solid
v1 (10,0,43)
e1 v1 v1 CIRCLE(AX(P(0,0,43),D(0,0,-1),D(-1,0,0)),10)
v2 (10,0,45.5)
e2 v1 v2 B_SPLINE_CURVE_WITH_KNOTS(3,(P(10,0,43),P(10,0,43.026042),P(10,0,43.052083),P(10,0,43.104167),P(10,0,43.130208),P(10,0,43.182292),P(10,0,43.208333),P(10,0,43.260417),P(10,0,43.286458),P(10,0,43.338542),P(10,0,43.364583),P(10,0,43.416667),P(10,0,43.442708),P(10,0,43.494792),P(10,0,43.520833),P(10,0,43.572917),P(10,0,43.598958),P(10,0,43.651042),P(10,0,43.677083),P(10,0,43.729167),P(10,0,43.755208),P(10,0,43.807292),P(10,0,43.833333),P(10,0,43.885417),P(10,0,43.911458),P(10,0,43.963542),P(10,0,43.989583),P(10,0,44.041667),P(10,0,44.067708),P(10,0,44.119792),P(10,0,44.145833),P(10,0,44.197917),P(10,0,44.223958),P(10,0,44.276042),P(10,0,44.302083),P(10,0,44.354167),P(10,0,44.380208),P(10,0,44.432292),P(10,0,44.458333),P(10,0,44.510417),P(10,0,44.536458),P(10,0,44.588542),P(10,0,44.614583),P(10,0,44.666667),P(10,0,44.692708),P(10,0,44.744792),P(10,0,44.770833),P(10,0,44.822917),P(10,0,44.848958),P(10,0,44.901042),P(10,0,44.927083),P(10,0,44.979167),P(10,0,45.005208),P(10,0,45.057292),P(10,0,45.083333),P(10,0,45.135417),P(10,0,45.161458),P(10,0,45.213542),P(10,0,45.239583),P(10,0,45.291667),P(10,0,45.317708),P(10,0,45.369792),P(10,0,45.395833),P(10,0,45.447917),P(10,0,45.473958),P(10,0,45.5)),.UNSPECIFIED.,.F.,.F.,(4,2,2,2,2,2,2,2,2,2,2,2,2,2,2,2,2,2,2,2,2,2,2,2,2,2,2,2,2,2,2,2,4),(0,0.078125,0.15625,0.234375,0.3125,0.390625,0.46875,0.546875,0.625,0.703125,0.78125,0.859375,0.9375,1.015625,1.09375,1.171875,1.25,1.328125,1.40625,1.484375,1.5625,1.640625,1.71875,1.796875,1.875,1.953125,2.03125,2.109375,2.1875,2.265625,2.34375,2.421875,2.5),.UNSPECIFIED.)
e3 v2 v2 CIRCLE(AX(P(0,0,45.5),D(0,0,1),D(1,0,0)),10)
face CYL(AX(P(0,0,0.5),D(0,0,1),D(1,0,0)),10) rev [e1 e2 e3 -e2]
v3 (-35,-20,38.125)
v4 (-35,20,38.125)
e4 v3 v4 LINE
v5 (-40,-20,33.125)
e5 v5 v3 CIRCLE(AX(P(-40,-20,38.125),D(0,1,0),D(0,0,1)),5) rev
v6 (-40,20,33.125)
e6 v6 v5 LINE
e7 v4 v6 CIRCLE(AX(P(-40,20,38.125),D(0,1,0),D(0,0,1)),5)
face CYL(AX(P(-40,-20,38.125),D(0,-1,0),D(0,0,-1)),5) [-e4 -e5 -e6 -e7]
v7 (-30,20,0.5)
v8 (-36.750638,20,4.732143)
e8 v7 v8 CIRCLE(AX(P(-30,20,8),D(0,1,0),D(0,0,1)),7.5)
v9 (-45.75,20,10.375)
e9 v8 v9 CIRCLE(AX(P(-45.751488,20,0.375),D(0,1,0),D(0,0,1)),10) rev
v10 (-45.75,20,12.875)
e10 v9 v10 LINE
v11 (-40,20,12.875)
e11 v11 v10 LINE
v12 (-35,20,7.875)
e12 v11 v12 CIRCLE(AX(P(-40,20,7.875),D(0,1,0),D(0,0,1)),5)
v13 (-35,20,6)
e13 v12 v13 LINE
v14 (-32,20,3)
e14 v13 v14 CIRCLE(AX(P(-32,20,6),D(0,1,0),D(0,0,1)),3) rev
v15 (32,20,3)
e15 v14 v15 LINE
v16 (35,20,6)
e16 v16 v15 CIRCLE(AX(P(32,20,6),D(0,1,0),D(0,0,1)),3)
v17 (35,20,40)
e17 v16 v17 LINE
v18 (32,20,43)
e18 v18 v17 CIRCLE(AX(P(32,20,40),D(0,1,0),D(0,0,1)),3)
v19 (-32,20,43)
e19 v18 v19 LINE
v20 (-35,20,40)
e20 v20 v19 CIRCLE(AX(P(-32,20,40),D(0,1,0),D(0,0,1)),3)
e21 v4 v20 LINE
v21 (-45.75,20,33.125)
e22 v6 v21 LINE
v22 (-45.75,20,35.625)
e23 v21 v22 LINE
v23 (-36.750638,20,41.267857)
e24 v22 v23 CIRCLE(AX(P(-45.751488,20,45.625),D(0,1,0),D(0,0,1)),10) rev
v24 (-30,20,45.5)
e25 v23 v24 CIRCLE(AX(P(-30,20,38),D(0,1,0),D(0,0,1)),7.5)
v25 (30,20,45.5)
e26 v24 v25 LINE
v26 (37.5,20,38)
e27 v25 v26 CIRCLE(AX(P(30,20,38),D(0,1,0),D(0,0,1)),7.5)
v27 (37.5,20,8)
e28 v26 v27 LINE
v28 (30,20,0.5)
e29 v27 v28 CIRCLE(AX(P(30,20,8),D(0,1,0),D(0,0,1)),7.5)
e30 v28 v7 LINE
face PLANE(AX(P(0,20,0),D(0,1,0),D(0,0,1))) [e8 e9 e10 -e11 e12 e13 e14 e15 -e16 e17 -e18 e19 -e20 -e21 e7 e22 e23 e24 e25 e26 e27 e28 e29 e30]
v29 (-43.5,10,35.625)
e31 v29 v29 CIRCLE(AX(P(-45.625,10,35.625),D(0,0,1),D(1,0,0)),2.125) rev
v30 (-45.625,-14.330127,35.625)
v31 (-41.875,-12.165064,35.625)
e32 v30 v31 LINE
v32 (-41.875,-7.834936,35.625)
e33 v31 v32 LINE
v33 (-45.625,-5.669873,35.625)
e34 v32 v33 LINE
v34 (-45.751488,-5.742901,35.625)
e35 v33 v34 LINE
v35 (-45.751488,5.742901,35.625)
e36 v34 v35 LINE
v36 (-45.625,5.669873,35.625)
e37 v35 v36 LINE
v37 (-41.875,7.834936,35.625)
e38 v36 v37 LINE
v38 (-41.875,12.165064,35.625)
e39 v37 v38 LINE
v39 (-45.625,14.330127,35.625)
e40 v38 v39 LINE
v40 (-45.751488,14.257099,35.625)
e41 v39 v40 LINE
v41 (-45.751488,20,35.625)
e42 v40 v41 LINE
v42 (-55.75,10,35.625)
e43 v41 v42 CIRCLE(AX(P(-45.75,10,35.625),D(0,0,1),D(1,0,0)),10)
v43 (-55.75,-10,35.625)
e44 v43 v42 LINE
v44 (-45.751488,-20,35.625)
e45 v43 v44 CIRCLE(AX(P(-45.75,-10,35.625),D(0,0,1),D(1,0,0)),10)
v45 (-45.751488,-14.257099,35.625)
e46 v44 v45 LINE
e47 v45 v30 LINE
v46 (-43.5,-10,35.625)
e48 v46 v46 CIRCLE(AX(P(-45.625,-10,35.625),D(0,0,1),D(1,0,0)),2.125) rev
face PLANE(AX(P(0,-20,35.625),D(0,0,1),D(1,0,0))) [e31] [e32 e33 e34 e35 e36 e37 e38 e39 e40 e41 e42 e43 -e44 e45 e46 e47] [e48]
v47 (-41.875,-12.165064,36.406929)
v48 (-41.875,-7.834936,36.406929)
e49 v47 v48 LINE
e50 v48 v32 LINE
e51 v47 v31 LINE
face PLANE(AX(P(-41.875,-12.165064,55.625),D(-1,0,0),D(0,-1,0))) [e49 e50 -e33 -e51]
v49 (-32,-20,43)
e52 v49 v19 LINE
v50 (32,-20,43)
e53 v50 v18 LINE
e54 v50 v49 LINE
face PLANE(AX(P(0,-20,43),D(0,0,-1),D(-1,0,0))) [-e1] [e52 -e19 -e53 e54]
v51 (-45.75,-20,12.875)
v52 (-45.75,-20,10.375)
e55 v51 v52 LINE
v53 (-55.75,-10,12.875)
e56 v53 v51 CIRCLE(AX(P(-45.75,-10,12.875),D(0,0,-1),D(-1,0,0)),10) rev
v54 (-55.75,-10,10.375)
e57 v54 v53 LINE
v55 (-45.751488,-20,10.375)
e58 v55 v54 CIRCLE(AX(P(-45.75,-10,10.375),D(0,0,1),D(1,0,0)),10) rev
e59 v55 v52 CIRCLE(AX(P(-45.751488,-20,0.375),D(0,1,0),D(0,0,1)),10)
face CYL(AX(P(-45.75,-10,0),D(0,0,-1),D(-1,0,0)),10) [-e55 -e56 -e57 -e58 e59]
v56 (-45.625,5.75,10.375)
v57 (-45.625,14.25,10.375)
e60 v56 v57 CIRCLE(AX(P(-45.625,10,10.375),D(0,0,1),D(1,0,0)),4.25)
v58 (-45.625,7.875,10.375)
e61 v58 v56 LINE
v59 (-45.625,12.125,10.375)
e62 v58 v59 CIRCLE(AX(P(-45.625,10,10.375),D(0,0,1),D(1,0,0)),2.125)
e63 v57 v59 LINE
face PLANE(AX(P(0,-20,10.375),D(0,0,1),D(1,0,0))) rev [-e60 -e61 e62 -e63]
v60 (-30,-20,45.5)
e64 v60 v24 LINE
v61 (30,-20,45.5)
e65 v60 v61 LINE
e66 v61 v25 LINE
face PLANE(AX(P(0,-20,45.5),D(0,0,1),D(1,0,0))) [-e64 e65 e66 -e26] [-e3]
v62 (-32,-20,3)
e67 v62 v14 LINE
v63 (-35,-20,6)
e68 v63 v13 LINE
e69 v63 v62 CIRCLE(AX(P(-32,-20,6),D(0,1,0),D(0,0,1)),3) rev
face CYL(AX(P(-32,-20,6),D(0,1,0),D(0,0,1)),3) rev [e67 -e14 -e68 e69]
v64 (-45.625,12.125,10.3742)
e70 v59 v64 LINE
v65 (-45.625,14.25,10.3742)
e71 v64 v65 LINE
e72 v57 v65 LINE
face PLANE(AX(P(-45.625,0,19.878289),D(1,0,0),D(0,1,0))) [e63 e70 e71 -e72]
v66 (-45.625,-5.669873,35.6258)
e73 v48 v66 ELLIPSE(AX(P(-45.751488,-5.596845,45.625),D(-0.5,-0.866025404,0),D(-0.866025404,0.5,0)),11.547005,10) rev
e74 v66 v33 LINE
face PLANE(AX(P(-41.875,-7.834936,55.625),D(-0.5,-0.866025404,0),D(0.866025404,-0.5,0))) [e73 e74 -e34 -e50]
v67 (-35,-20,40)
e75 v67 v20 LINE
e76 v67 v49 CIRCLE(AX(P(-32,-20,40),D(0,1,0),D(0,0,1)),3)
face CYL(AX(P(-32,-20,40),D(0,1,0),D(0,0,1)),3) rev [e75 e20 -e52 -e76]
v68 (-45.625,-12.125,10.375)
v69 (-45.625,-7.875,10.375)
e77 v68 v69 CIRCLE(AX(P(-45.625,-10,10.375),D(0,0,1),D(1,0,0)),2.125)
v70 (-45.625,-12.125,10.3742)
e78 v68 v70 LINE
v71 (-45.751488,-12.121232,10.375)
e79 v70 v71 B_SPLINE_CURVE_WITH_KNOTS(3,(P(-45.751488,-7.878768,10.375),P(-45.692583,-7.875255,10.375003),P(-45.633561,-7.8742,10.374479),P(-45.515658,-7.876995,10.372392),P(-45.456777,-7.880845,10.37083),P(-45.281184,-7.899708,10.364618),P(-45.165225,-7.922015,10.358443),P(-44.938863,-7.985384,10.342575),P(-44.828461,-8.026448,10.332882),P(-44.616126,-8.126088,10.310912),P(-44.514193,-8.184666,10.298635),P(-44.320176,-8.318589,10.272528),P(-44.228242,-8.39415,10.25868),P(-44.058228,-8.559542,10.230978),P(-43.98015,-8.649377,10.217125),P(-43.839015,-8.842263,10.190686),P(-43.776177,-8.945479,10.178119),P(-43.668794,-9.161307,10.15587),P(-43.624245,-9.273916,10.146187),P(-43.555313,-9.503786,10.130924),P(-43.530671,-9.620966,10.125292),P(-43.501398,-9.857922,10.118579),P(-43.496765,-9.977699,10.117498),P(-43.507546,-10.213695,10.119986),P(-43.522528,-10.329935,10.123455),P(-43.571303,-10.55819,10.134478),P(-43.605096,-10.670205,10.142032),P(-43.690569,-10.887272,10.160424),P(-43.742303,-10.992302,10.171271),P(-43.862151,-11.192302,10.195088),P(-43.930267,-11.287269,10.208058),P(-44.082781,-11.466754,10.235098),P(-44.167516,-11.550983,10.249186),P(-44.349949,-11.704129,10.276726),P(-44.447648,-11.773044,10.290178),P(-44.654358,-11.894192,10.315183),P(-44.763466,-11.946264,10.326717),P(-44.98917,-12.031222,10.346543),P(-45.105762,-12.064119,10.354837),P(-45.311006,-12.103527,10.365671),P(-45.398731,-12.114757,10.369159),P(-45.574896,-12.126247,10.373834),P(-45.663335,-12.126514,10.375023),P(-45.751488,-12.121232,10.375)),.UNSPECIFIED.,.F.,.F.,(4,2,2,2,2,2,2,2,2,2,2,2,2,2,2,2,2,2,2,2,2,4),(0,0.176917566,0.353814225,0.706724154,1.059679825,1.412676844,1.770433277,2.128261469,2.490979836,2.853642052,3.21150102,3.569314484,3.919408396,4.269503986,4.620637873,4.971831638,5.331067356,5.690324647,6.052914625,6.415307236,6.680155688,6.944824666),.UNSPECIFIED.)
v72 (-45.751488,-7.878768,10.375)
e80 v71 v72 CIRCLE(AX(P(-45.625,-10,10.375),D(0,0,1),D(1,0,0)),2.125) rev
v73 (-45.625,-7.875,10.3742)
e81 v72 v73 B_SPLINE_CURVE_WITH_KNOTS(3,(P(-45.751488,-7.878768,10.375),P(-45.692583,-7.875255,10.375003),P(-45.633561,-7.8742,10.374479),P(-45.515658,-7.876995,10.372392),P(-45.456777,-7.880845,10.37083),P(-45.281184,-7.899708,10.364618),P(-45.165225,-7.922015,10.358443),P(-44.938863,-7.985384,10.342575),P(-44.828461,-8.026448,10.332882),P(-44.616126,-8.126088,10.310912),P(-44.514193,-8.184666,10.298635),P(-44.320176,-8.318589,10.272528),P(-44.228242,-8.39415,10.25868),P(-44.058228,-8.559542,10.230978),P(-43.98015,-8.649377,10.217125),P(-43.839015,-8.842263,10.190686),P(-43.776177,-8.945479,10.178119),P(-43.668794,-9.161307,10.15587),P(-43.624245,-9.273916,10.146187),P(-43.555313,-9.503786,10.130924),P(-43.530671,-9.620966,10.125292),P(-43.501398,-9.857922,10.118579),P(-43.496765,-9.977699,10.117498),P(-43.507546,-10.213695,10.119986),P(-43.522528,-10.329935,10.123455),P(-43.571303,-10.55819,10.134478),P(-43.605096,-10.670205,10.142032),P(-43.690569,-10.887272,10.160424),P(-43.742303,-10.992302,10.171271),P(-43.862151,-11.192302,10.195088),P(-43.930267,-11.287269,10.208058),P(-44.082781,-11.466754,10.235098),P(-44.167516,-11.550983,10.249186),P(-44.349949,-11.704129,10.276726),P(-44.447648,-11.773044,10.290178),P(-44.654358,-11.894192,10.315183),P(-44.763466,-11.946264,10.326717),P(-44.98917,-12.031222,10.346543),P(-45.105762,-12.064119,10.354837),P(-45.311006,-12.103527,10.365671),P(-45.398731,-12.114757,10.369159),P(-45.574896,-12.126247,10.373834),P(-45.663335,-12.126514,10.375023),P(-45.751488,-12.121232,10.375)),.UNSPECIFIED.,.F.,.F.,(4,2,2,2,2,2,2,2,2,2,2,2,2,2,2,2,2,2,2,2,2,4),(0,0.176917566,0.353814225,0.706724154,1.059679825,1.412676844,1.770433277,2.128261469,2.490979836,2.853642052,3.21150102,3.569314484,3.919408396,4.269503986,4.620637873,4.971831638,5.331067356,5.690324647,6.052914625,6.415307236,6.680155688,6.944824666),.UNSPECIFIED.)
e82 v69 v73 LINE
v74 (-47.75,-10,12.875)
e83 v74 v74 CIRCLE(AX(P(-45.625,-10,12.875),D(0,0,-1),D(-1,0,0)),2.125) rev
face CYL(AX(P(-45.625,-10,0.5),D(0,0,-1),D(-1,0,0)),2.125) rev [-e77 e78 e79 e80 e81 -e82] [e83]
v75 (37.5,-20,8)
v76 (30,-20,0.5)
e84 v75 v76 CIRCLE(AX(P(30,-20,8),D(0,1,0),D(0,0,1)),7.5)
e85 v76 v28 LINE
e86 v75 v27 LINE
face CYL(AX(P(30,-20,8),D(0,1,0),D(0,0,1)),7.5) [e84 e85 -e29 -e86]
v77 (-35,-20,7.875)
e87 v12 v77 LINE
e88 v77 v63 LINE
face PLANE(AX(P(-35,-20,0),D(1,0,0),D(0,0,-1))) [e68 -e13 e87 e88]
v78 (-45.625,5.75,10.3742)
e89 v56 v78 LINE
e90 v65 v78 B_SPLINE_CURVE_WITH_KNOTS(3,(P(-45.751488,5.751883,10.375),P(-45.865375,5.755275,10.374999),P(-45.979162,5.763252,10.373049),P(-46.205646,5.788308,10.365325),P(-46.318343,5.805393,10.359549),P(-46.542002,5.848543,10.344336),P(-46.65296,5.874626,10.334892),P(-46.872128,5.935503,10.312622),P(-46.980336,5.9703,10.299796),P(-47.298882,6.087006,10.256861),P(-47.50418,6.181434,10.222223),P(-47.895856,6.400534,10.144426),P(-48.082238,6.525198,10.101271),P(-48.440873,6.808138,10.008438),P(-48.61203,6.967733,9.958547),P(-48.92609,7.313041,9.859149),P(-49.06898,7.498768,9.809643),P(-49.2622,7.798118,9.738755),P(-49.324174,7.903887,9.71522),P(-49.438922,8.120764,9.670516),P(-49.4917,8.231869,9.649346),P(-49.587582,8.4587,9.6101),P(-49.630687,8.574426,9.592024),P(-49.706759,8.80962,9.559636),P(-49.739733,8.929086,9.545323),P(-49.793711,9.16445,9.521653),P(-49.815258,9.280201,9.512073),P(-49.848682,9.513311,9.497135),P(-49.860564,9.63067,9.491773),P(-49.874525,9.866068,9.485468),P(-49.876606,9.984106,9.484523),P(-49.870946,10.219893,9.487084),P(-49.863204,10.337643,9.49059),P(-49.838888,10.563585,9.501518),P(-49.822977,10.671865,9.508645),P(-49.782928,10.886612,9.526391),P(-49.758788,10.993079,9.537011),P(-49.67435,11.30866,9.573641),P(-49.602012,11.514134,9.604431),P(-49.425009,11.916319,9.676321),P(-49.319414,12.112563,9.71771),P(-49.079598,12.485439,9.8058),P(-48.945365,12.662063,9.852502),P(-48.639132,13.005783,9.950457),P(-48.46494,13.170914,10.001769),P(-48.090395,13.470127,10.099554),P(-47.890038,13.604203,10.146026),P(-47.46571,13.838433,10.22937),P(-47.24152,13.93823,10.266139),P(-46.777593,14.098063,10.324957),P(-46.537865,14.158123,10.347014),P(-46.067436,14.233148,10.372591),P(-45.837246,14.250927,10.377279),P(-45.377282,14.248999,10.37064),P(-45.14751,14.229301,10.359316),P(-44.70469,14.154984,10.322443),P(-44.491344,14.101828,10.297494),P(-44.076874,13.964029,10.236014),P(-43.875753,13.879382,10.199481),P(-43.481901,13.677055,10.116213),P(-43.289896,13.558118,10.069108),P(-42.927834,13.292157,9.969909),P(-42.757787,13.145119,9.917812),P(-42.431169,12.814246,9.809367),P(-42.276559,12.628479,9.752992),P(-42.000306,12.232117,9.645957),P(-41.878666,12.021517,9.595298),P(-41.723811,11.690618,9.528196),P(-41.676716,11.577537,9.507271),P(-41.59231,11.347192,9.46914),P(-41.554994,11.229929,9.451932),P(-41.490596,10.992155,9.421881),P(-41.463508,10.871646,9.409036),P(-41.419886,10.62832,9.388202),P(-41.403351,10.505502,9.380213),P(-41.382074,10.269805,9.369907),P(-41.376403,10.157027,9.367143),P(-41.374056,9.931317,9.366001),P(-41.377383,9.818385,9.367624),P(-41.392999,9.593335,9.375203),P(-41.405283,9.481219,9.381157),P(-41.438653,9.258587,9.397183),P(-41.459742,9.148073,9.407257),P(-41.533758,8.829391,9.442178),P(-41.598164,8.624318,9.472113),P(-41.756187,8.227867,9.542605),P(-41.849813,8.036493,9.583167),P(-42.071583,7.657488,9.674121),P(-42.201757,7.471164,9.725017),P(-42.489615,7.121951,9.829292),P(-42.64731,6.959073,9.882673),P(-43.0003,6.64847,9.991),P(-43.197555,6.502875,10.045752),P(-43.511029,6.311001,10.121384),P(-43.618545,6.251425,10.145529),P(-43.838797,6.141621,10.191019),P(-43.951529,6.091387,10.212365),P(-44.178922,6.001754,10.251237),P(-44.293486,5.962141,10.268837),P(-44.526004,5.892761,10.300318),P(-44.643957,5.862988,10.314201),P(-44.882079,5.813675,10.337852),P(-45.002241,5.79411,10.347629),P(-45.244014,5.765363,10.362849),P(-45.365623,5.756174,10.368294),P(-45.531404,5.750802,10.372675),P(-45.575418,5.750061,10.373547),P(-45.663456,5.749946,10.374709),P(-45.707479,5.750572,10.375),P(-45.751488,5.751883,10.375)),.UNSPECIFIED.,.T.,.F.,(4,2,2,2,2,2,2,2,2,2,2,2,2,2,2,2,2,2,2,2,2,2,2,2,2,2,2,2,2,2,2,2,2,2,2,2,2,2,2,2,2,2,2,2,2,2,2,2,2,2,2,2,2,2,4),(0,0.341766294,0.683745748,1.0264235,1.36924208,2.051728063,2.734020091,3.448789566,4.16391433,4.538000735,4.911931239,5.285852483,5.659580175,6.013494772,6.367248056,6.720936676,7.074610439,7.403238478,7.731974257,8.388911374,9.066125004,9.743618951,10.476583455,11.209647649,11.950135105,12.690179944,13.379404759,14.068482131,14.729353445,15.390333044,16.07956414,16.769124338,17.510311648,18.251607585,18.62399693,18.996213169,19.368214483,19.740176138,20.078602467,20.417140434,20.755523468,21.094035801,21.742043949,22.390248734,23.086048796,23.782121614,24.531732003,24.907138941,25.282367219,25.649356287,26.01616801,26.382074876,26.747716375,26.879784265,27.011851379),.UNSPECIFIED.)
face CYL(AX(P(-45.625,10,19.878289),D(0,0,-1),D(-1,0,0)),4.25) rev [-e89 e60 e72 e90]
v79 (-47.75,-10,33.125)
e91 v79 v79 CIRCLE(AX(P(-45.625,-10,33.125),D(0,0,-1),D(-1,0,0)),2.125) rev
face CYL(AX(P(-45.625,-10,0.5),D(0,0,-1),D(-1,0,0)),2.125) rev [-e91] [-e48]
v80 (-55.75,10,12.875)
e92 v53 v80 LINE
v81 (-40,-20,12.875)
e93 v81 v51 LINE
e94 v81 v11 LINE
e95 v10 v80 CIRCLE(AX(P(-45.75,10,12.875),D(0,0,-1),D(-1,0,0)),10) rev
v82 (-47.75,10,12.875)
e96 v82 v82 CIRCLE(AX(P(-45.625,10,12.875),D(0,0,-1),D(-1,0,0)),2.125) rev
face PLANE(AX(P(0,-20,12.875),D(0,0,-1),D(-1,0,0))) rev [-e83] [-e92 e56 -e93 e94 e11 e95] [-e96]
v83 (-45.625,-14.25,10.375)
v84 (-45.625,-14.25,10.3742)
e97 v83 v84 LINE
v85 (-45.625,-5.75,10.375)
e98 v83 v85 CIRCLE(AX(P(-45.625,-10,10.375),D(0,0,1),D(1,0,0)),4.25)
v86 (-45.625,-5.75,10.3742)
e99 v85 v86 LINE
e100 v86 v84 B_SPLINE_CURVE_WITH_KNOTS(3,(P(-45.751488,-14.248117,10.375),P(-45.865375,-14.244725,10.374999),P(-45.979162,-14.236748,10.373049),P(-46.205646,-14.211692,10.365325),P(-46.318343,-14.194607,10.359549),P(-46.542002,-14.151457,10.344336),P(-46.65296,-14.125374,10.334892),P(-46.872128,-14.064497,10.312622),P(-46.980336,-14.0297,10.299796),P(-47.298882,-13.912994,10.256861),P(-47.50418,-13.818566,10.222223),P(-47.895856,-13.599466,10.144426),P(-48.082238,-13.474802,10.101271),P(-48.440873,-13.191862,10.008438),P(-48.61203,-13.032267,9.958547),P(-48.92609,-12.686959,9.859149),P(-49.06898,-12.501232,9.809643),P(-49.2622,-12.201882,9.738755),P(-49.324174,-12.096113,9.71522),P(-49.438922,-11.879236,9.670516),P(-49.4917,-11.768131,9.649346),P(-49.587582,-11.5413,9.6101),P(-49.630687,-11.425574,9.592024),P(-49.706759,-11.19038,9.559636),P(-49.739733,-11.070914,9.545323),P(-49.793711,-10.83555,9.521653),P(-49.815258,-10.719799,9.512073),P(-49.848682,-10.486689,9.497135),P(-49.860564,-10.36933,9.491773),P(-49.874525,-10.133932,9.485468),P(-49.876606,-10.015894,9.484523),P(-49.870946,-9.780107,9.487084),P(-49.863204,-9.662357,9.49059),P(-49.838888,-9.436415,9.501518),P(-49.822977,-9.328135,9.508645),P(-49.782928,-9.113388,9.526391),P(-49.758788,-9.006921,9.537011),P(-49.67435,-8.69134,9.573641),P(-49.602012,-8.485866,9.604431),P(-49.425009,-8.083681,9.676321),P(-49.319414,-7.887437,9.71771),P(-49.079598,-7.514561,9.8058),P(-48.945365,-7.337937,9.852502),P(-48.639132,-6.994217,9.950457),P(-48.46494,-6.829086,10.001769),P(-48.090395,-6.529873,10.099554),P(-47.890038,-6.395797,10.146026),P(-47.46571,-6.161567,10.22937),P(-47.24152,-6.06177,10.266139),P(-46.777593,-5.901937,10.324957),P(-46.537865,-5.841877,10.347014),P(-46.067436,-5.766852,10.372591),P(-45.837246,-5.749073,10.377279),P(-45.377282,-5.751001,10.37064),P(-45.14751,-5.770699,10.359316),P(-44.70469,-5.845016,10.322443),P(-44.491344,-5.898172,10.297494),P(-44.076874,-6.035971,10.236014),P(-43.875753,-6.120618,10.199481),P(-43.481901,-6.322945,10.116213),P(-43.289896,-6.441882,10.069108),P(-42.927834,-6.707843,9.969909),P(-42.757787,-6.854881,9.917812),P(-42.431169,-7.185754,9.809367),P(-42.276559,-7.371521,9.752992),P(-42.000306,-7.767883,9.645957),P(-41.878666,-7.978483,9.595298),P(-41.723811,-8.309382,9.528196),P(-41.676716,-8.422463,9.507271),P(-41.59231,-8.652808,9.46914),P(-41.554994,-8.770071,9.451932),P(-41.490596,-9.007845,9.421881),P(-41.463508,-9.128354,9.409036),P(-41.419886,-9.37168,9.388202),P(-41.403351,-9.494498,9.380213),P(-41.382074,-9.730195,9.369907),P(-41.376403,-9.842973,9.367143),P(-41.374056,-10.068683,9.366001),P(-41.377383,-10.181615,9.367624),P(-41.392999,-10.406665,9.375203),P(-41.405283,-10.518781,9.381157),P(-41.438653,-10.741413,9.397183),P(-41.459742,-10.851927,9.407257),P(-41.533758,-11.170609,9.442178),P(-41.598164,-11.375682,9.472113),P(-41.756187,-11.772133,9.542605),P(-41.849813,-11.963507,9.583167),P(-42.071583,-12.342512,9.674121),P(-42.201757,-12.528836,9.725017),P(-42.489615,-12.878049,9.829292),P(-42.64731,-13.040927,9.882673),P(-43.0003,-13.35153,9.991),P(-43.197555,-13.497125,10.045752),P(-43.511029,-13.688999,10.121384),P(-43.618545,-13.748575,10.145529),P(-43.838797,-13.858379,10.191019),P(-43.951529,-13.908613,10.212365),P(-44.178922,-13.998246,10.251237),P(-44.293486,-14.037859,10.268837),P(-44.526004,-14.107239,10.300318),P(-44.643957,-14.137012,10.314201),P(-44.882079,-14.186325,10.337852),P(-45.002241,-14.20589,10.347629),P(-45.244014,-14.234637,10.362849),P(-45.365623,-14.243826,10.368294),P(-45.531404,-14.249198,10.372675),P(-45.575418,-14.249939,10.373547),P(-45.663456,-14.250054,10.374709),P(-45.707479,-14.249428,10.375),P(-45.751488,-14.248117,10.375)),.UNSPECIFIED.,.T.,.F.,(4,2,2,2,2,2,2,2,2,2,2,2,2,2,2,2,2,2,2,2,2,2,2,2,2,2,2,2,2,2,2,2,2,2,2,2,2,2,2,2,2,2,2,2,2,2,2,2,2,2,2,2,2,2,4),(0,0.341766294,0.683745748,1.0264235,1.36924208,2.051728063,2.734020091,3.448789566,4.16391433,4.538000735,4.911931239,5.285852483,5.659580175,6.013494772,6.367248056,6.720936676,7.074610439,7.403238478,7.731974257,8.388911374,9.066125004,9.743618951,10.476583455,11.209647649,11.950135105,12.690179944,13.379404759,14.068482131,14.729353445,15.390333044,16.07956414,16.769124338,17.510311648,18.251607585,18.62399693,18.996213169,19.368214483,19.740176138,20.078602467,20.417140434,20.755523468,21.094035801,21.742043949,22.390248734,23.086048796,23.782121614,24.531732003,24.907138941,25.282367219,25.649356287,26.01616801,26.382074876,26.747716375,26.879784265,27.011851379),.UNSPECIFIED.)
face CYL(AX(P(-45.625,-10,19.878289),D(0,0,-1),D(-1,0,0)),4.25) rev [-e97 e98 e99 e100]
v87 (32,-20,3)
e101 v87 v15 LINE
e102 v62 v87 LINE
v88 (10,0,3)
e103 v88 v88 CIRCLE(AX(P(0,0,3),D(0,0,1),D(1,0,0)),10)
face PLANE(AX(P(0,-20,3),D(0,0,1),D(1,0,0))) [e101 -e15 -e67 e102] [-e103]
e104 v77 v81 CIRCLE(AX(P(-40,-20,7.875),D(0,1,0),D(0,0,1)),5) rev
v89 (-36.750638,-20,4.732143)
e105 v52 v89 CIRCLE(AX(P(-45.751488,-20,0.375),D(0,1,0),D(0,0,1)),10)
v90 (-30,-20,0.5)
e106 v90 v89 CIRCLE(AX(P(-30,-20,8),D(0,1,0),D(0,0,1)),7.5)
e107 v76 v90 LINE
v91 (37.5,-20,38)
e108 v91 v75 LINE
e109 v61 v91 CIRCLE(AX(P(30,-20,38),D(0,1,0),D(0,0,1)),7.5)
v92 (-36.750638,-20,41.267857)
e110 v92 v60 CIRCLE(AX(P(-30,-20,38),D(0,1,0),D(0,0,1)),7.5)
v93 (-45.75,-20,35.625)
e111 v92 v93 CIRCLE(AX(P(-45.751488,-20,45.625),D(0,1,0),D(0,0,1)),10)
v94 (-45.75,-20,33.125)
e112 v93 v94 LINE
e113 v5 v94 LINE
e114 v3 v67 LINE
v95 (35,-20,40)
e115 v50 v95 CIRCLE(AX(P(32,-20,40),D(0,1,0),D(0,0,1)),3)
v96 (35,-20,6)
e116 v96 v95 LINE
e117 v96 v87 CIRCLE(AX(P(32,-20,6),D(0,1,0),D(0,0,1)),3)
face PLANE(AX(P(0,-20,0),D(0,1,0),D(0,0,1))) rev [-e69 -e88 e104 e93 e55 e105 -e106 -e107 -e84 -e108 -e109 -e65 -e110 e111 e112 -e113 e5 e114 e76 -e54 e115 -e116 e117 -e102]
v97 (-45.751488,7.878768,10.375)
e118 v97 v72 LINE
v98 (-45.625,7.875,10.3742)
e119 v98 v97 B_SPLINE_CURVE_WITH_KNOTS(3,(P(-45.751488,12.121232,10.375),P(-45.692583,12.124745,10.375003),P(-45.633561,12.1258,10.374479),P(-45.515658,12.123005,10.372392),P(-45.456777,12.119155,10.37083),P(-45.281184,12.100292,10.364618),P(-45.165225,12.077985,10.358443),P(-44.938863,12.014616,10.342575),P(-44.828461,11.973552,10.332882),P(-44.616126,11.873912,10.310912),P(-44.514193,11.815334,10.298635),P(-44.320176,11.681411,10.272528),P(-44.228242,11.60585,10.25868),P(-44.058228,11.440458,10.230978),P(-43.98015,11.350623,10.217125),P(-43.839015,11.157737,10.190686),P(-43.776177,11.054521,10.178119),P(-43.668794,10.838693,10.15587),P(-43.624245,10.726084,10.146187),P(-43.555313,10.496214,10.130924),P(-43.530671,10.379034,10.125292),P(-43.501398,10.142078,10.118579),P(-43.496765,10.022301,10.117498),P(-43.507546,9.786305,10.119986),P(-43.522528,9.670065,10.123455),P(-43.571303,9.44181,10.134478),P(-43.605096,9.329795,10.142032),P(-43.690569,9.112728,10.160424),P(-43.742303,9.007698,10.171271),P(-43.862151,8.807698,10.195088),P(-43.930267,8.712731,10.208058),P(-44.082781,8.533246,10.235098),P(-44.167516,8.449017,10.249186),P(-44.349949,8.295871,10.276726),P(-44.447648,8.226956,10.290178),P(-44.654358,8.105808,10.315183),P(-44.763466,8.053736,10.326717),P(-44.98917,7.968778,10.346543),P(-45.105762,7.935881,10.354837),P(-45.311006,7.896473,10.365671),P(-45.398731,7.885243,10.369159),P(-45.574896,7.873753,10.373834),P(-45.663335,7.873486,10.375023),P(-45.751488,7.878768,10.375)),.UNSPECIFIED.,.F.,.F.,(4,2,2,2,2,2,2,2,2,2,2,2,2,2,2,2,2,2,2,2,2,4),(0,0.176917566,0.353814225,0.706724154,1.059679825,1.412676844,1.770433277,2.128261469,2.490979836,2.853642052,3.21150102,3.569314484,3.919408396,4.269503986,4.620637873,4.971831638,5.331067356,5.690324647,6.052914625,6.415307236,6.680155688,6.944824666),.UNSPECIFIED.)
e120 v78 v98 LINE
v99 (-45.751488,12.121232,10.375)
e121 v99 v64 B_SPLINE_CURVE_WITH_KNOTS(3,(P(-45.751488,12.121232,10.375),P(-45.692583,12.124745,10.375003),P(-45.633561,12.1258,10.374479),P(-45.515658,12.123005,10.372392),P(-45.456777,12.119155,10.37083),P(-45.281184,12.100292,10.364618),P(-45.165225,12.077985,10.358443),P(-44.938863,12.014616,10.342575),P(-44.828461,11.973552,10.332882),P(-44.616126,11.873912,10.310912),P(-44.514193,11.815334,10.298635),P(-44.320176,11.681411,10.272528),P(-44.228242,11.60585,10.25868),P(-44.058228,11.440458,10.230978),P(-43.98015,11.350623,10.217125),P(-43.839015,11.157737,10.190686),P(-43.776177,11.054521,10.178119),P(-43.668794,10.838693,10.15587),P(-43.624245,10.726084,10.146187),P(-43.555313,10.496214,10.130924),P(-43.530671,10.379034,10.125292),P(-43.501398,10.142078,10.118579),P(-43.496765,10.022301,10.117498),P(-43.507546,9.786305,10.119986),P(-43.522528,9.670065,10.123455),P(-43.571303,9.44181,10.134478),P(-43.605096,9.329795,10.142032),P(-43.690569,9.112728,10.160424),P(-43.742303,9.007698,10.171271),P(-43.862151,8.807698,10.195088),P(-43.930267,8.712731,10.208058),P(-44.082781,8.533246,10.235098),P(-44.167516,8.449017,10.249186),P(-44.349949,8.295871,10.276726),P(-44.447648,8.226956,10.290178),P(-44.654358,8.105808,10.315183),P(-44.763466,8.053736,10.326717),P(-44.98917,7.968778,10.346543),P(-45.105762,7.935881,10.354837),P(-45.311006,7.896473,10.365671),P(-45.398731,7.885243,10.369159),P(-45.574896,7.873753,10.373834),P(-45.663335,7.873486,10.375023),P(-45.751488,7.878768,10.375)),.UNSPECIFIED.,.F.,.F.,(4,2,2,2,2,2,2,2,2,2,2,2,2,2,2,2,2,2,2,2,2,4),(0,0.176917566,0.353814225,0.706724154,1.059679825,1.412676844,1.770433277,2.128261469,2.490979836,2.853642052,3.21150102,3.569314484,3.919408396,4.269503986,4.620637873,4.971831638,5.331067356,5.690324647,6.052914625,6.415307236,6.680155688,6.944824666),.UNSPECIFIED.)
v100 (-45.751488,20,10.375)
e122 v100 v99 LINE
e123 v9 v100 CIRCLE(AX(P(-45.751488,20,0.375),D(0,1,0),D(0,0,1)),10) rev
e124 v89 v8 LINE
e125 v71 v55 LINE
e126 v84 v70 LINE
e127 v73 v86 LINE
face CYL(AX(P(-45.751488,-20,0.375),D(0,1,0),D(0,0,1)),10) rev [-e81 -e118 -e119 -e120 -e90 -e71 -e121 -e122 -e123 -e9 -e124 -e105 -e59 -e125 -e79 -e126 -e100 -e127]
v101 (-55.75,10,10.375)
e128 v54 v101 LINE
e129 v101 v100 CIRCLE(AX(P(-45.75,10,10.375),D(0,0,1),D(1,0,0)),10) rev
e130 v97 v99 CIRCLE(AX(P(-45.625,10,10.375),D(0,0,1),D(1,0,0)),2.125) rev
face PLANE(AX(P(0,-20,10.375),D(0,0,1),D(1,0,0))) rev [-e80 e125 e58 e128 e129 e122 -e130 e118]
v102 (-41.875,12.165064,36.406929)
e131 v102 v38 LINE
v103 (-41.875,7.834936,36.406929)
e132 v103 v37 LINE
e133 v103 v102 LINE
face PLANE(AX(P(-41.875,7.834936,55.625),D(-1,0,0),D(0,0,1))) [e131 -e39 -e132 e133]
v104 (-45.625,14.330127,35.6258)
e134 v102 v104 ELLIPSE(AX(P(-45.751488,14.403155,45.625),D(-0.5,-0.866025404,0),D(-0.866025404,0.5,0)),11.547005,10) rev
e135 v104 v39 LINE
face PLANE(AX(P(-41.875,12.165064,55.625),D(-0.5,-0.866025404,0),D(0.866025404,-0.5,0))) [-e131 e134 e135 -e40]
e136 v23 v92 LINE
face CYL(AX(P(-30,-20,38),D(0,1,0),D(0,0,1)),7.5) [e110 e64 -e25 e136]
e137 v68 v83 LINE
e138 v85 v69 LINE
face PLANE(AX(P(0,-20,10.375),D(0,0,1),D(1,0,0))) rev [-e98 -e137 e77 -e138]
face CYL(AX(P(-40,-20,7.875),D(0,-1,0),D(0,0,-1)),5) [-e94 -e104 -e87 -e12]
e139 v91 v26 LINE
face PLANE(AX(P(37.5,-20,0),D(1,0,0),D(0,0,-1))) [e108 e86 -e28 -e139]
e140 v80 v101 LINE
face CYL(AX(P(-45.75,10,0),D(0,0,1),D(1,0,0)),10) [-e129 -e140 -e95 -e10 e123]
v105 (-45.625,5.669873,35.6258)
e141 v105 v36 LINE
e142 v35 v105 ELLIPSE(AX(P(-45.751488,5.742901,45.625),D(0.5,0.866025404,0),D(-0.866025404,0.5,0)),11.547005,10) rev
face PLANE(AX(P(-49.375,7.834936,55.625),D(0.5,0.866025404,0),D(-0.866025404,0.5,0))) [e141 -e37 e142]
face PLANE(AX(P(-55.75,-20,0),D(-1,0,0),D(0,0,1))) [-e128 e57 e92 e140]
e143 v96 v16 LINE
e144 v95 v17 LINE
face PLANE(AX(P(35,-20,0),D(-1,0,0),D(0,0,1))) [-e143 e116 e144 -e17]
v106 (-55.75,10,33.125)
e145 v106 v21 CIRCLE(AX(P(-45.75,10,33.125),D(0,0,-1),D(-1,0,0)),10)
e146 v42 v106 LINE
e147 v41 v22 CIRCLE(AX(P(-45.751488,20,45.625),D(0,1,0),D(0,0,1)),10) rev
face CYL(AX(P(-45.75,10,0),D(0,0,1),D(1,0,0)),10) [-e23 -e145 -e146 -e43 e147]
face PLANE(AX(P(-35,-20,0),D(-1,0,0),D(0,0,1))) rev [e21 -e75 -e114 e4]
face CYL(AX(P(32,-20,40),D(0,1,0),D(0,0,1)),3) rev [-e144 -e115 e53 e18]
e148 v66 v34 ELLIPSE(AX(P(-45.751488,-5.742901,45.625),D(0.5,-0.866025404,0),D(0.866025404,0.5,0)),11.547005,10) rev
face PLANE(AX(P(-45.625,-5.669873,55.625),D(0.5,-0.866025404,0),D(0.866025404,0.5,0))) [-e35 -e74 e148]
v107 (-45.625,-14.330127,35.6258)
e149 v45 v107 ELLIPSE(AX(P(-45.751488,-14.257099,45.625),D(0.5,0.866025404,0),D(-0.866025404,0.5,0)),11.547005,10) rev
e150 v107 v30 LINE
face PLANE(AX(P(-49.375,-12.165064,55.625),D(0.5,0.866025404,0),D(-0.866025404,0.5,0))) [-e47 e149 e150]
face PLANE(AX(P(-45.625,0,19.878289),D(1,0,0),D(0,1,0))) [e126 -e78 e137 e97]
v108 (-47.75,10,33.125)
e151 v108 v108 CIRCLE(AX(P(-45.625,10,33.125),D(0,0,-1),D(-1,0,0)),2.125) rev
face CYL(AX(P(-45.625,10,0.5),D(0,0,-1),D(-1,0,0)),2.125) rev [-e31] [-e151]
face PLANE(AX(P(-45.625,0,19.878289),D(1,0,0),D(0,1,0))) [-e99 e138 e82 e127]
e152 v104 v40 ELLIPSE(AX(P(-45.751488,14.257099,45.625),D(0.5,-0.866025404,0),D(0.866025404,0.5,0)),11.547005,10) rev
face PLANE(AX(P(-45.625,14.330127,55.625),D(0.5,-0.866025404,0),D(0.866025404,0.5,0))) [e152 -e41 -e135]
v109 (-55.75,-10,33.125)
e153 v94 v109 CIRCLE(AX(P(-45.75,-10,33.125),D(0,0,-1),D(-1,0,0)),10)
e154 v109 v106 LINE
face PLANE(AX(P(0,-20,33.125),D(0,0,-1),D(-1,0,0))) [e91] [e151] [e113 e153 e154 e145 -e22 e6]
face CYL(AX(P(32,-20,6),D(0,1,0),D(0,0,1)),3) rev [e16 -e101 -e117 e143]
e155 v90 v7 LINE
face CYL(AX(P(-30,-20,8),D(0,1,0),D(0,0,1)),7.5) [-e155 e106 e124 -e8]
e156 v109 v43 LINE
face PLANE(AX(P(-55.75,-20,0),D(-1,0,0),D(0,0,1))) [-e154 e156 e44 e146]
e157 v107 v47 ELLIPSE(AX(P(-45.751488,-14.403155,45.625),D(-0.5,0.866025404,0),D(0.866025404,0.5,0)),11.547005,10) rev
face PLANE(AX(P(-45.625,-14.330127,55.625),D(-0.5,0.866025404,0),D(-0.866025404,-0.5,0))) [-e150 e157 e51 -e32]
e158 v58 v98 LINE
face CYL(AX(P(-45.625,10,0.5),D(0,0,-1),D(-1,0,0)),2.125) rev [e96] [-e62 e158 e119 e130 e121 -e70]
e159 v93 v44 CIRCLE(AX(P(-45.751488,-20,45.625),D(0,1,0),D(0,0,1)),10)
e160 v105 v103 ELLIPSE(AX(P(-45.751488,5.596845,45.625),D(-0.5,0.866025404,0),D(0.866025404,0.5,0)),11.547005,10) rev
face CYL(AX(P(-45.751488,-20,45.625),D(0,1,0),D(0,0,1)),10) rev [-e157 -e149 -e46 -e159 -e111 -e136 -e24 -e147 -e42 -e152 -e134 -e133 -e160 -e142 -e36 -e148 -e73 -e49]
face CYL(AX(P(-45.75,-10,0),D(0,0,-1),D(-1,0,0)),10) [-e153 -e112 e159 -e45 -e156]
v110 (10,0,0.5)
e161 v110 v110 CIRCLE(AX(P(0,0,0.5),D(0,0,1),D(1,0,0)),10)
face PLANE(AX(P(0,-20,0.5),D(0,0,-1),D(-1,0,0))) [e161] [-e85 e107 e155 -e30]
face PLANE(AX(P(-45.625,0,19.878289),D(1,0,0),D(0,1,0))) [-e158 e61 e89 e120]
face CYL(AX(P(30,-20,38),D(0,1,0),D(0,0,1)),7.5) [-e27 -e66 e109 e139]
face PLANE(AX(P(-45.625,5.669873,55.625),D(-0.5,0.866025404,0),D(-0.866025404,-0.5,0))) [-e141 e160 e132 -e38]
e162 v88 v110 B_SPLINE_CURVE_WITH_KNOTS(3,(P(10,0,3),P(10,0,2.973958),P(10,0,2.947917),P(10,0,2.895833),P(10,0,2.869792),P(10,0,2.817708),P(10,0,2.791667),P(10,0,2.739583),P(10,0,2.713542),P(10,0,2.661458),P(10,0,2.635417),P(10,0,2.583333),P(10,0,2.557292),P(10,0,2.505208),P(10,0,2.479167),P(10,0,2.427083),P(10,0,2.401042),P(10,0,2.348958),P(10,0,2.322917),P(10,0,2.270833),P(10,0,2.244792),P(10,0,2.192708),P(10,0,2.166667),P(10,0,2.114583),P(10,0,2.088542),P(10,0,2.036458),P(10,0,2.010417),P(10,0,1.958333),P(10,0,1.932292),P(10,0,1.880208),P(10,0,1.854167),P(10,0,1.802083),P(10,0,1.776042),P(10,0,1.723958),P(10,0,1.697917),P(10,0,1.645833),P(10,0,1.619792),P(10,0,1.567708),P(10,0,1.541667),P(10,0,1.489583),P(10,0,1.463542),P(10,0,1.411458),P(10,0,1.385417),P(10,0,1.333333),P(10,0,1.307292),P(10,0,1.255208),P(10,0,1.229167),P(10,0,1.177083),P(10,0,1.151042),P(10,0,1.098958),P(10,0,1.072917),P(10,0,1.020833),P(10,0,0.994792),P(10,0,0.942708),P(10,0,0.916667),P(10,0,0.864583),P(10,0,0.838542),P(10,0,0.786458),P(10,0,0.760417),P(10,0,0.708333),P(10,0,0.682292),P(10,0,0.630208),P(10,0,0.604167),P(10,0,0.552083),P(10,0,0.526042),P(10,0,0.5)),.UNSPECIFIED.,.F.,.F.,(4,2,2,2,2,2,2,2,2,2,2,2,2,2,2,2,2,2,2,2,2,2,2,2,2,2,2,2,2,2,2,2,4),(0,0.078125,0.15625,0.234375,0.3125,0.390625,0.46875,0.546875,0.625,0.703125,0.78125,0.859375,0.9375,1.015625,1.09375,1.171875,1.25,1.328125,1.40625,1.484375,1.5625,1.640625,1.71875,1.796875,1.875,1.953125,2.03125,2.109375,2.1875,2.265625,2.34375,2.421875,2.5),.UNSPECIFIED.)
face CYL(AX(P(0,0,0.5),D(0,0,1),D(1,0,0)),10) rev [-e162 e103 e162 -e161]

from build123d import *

# Parameters (mm, degrees)
BOSS_EXTRUDE1_DEPTH                 = 20
BOSS_EXTRUDE1_DEPTH_BACK            = 20
FILLET1_R                           = 10
CUT_EXTRUDE1_DEPTH                  = 75.688101624
CUT_EXTRUDE1_DEPTH_BACK             = 75.688101624
CUT_EXTRUDE2_DEPTH                  = 10.375
CUT_EXTRUDE2_DIRECTION_2_REACH      = 76.688
CUT_EXTRUDE2_DIRECTION_2_END_RADIUS = 10
FILLET2_R                           = 10
FILLET3_R                           = 5
CUT_EXTRUDE3_DEPTH                  = 20
CUT_EXTRUDE4_DEPTH                  = 75.384558372
CUT_EXTRUDE4_DEPTH_BACK             = 75.384558372
SKETCH4_R                           = 10


with BuildPart() as part:
    # Sketch1 → Boss-Extrude1 (new, two sides: drawn at the far end of the back side and taken through both)
    with BuildSketch(Plane(origin=(0, 0, 0), x_dir=(1, 0, 0), z_dir=(0, 1, 0)).offset(-BOSS_EXTRUDE1_DEPTH_BACK)):
        with BuildLine():
            Line((-35, -33.125), (-55.75, -33.125))
            Line((-55.75, -33.125), (-55.75, -35.625))
            Line((-55.75, -35.625), (-37.5, -35.625))
            Line((-37.5, -35.625), (-37.5, -38))
            ThreePointArc((-37.5, -38), (-35.303300859, -43.303300859), (-30, -45.5))
            Line((-30, -45.5), (30, -45.5))
            ThreePointArc((30, -45.5), (35.303300859, -43.303300859), (37.5, -38))
            Line((37.5, -38), (37.5, -8))
            ThreePointArc((37.5, -8), (35.303300859, -2.696699141), (30, -0.5))
            Line((30, -0.5), (-30, -0.5))
            ThreePointArc((-30, -0.5), (-35.303300859, -2.696699141), (-37.5, -8))
            Line((-37.5, -8), (-37.5, -10.375))
            Line((-37.5, -10.375), (-55.75, -10.375))
            Line((-55.75, -10.375), (-55.75, -12.875))
            Line((-55.75, -12.875), (-35, -12.875))
            Line((-35, -12.875), (-35, -6))
            ThreePointArc((-35, -6), (-34.121320344, -3.878679656), (-32, -3))
            Line((-32, -3), (32, -3))
            ThreePointArc((32, -3), (34.121320344, -3.878679656), (35, -6))
            Line((35, -6), (35, -40))
            ThreePointArc((35, -40), (34.121320344, -42.121320344), (32, -43))
            Line((32, -43), (-32, -43))
            ThreePointArc((-32, -43), (-34.121320344, -42.121320344), (-35, -40))
            Line((-35, -40), (-35, -33.125))
        make_face()
    extrude(amount=BOSS_EXTRUDE1_DEPTH + BOSS_EXTRUDE1_DEPTH_BACK)

    # Fillet1
    fillet1_edges = [part.edges().sort_by_distance(p)[0] for p in [
        (-37.5, 0, 10.375),
        (-37.5, 0, 35.625),
    ]]
    fillet(fillet1_edges, radius=FILLET1_R)

    # Sketch2 → Cut-Extrude1 (cut, two sides: drawn at the far end of the back side and taken through both)
    with BuildSketch(Plane.XY.offset(-CUT_EXTRUDE1_DEPTH_BACK)):
        with BuildLine():
            ThreePointArc((-43.5, -10), (-44.12239809, -8.49739809), (-45.625, -7.875))
            Line((-45.625, -7.875), (-45.625, -12.125))
            ThreePointArc((-45.625, -12.125), (-44.12239809, -11.50260191), (-43.5, -10))
        make_face()
        with BuildLine():
            Line((-45.625, -12.125), (-45.625, -7.875))
            ThreePointArc((-45.625, -7.875), (-47.75, -10), (-45.625, -12.125))
        make_face()
        with BuildLine():
            ThreePointArc((-43.5, 10), (-44.12239809, 11.50260191), (-45.625, 12.125))
            Line((-45.625, 12.125), (-45.625, 7.875))
            ThreePointArc((-45.625, 7.875), (-44.12239809, 8.49739809), (-43.5, 10))
        make_face()
        with BuildLine():
            Line((-45.625, 7.875), (-45.625, 12.125))
            ThreePointArc((-45.625, 12.125), (-47.75, 10), (-45.625, 7.875))
        make_face()
    extrude(amount=CUT_EXTRUDE1_DEPTH + CUT_EXTRUDE1_DEPTH_BACK, mode=Mode.SUBTRACT)

    # Sketch2<4> → Cut-Extrude2 (cut)
    with BuildSketch(Plane.XY):
        with BuildLine():
            ThreePointArc((-41.375, 10), (-42.61979618, 13.00520382), (-45.625, 14.25))
            Line((-45.625, 14.25), (-45.625, 12.125))
            ThreePointArc((-45.625, 12.125), (-44.12239809, 11.50260191), (-43.5, 10))
            ThreePointArc((-43.5, 10), (-44.12239809, 8.49739809), (-45.625, 7.875))
            Line((-45.625, 7.875), (-45.625, 5.75))
            ThreePointArc((-45.625, 5.75), (-42.61979618, 6.99479618), (-41.375, 10))
        make_face()
        with BuildLine():
            Line((-45.625, 12.125), (-45.625, 14.25))
            ThreePointArc((-45.625, 14.25), (-49.875, 10), (-45.625, 5.75))
            Line((-45.625, 5.75), (-45.625, 7.875))
            ThreePointArc((-45.625, 7.875), (-47.75, 10), (-45.625, 12.125))
        make_face()
        with BuildLine():
            ThreePointArc((-41.375, -10), (-42.61979618, -6.99479618), (-45.625, -5.75))
            Line((-45.625, -5.75), (-45.625, -7.875))
            ThreePointArc((-45.625, -7.875), (-44.12239809, -8.49739809), (-43.5, -10))
            ThreePointArc((-43.5, -10), (-44.12239809, -11.50260191), (-45.625, -12.125))
            Line((-45.625, -12.125), (-45.625, -14.25))
            ThreePointArc((-45.625, -14.25), (-42.61979618, -13.00520382), (-41.375, -10))
        make_face()
        with BuildLine():
            Line((-45.625, -7.875), (-45.625, -5.75))
            ThreePointArc((-45.625, -5.75), (-49.875, -10), (-45.625, -14.25))
            Line((-45.625, -14.25), (-45.625, -12.125))
            ThreePointArc((-45.625, -12.125), (-47.75, -10), (-45.625, -7.875))
        make_face()
    extrude(amount=CUT_EXTRUDE2_DEPTH, mode=Mode.SUBTRACT)

    # Cut-Extrude2 direction 2: up to this cylinder (the profile starts inside it)
    cut_extrude2_direction_2_end = Plane(origin=(-45.751488025, -2.938005, 0.375), z_dir=(0, 1, 0)) * Cylinder(CUT_EXTRUDE2_DIRECTION_2_END_RADIUS, 194.376, mode=Mode.PRIVATE)
    # Sketch2<4> → Cut-Extrude2 direction 2 (cut, up to the surface)
    with BuildSketch(Plane.XY, mode=Mode.PRIVATE) as cut_extrude2_direction_2_sk1:
        with BuildLine():
            ThreePointArc((-41.375, 10), (-42.61979618, 13.00520382), (-45.625, 14.25))
            Line((-45.625, 14.25), (-45.625, 12.125))
            ThreePointArc((-45.625, 12.125), (-44.12239809, 11.50260191), (-43.5, 10))
            ThreePointArc((-43.5, 10), (-44.12239809, 8.49739809), (-45.625, 7.875))
            Line((-45.625, 7.875), (-45.625, 5.75))
            ThreePointArc((-45.625, 5.75), (-42.61979618, 6.99479618), (-41.375, 10))
        make_face()
    cut_extrude2_direction_2_tool1 = extrude(cut_extrude2_direction_2_sk1.sketch, amount=-CUT_EXTRUDE2_DIRECTION_2_REACH, mode=Mode.PRIVATE) & cut_extrude2_direction_2_end
    add(cut_extrude2_direction_2_tool1.solids().sort_by_distance((-42.686995, 7.061995, 0))[0], mode=Mode.SUBTRACT)
    # Sketch2<4> → Cut-Extrude2 direction 2 (cut, up to the surface)
    with BuildSketch(Plane.XY, mode=Mode.PRIVATE) as cut_extrude2_direction_2_sk2:
        with BuildLine():
            Line((-45.625, 12.125), (-45.625, 14.25))
            ThreePointArc((-45.625, 14.25), (-49.875, 10), (-45.625, 5.75))
            Line((-45.625, 5.75), (-45.625, 7.875))
            ThreePointArc((-45.625, 7.875), (-47.75, 10), (-45.625, 12.125))
        make_face()
    cut_extrude2_direction_2_tool2 = extrude(cut_extrude2_direction_2_sk2.sketch, amount=-CUT_EXTRUDE2_DIRECTION_2_REACH, mode=Mode.PRIVATE) & cut_extrude2_direction_2_end
    add(cut_extrude2_direction_2_tool2.solids().sort_by_distance((-45.720033, 6.8125, 0))[0], mode=Mode.SUBTRACT)
    # Sketch2<4> → Cut-Extrude2 direction 2 (cut, up to the surface)
    with BuildSketch(Plane.XY, mode=Mode.PRIVATE) as cut_extrude2_direction_2_sk3:
        with BuildLine():
            ThreePointArc((-41.375, -10), (-42.61979618, -6.99479618), (-45.625, -5.75))
            Line((-45.625, -5.75), (-45.625, -7.875))
            ThreePointArc((-45.625, -7.875), (-44.12239809, -8.49739809), (-43.5, -10))
            ThreePointArc((-43.5, -10), (-44.12239809, -11.50260191), (-45.625, -12.125))
            Line((-45.625, -12.125), (-45.625, -14.25))
            ThreePointArc((-45.625, -14.25), (-42.61979618, -13.00520382), (-41.375, -10))
        make_face()
    cut_extrude2_direction_2_tool3 = extrude(cut_extrude2_direction_2_sk3.sketch, amount=-CUT_EXTRUDE2_DIRECTION_2_REACH, mode=Mode.PRIVATE) & cut_extrude2_direction_2_end
    add(cut_extrude2_direction_2_tool3.solids().sort_by_distance((-42.686995, -12.938005, 0))[0], mode=Mode.SUBTRACT)
    # Sketch2<4> → Cut-Extrude2 direction 2 (cut, up to the surface)
    with BuildSketch(Plane.XY, mode=Mode.PRIVATE) as cut_extrude2_direction_2_sk4:
        with BuildLine():
            Line((-45.625, -7.875), (-45.625, -5.75))
            ThreePointArc((-45.625, -5.75), (-49.875, -10), (-45.625, -14.25))
            Line((-45.625, -14.25), (-45.625, -12.125))
            ThreePointArc((-45.625, -12.125), (-47.75, -10), (-45.625, -7.875))
        make_face()
    cut_extrude2_direction_2_tool4 = extrude(cut_extrude2_direction_2_sk4.sketch, amount=-CUT_EXTRUDE2_DIRECTION_2_REACH, mode=Mode.PRIVATE) & cut_extrude2_direction_2_end
    add(cut_extrude2_direction_2_tool4.solids().sort_by_distance((-49.779967, -10, 0))[0], mode=Mode.SUBTRACT)

    # Fillet2
    # the kernel refuses this fillet: 10 mm, written as the material it takes off along each edge
    with BuildSketch(Plane(origin=(-55.75, 20, -14.625), x_dir=(1, 0, 0), z_dir=(0, 0, 1)), Plane(origin=(-55.75, 20, 8.125), x_dir=(1, 0, 0), z_dir=(0, 0, 1))) as fillet2_piece_1:
        with BuildLine():
            CenterArc((FILLET2_R, -FILLET2_R), FILLET2_R, 90, 90)
            Line((0, -FILLET2_R), (0, 0))
            Line((0, 0), (FILLET2_R, 0))
        make_face()
    extrude(amount=52.5, mode=Mode.SUBTRACT)
    with BuildSketch(Plane(origin=(-55.75, -20, -14.625), x_dir=(1, 0, 0), z_dir=(0, 0, 1)), Plane(origin=(-55.75, -20, 8.125), x_dir=(1, 0, 0), z_dir=(0, 0, 1))) as fillet2_piece_2:
        with BuildLine():
            CenterArc((FILLET2_R, FILLET2_R), FILLET2_R, 180, 90)
            Line((0, FILLET2_R), (0, 0))
            Line((0, 0), (FILLET2_R, 0))
        make_face()
    extrude(amount=52.5, mode=Mode.SUBTRACT)

    # Fillet3
    fillet3_edges = [part.edges().sort_by_distance(p)[0] for p in [
        (-35, 0, 33.125),
        (-35, 0, 12.875),
    ]]
    fillet(fillet3_edges, radius=FILLET3_R)

    # Sketch3 → Cut-Extrude3 (cut)
    with BuildSketch(Plane.XY.offset(35.625)):
        Polygon((-45.625, 14.330127019), (-49.375, 12.165063509), (-49.375, 7.834936491), (-45.625, 5.669872981), (-41.875, 7.834936491), (-41.875, 12.165063509), align=None)
        Polygon((-45.625, -5.669872981), (-49.375, -7.834936491), (-49.375, -12.165063509), (-45.625, -14.330127019), (-41.875, -12.165063509), (-41.875, -7.834936491), align=None)
    extrude(amount=CUT_EXTRUDE3_DEPTH, mode=Mode.SUBTRACT)

    # Sketch4 → Cut-Extrude4 (cut, two sides: drawn at the far end of the back side and taken through both)
    with BuildSketch(Plane.XY.offset(45.5).offset(-CUT_EXTRUDE4_DEPTH_BACK)):
        Circle(SKETCH4_R)
    extrude(amount=CUT_EXTRUDE4_DEPTH + CUT_EXTRUDE4_DEPTH_BACK, mode=Mode.SUBTRACT)


solid = part.part
